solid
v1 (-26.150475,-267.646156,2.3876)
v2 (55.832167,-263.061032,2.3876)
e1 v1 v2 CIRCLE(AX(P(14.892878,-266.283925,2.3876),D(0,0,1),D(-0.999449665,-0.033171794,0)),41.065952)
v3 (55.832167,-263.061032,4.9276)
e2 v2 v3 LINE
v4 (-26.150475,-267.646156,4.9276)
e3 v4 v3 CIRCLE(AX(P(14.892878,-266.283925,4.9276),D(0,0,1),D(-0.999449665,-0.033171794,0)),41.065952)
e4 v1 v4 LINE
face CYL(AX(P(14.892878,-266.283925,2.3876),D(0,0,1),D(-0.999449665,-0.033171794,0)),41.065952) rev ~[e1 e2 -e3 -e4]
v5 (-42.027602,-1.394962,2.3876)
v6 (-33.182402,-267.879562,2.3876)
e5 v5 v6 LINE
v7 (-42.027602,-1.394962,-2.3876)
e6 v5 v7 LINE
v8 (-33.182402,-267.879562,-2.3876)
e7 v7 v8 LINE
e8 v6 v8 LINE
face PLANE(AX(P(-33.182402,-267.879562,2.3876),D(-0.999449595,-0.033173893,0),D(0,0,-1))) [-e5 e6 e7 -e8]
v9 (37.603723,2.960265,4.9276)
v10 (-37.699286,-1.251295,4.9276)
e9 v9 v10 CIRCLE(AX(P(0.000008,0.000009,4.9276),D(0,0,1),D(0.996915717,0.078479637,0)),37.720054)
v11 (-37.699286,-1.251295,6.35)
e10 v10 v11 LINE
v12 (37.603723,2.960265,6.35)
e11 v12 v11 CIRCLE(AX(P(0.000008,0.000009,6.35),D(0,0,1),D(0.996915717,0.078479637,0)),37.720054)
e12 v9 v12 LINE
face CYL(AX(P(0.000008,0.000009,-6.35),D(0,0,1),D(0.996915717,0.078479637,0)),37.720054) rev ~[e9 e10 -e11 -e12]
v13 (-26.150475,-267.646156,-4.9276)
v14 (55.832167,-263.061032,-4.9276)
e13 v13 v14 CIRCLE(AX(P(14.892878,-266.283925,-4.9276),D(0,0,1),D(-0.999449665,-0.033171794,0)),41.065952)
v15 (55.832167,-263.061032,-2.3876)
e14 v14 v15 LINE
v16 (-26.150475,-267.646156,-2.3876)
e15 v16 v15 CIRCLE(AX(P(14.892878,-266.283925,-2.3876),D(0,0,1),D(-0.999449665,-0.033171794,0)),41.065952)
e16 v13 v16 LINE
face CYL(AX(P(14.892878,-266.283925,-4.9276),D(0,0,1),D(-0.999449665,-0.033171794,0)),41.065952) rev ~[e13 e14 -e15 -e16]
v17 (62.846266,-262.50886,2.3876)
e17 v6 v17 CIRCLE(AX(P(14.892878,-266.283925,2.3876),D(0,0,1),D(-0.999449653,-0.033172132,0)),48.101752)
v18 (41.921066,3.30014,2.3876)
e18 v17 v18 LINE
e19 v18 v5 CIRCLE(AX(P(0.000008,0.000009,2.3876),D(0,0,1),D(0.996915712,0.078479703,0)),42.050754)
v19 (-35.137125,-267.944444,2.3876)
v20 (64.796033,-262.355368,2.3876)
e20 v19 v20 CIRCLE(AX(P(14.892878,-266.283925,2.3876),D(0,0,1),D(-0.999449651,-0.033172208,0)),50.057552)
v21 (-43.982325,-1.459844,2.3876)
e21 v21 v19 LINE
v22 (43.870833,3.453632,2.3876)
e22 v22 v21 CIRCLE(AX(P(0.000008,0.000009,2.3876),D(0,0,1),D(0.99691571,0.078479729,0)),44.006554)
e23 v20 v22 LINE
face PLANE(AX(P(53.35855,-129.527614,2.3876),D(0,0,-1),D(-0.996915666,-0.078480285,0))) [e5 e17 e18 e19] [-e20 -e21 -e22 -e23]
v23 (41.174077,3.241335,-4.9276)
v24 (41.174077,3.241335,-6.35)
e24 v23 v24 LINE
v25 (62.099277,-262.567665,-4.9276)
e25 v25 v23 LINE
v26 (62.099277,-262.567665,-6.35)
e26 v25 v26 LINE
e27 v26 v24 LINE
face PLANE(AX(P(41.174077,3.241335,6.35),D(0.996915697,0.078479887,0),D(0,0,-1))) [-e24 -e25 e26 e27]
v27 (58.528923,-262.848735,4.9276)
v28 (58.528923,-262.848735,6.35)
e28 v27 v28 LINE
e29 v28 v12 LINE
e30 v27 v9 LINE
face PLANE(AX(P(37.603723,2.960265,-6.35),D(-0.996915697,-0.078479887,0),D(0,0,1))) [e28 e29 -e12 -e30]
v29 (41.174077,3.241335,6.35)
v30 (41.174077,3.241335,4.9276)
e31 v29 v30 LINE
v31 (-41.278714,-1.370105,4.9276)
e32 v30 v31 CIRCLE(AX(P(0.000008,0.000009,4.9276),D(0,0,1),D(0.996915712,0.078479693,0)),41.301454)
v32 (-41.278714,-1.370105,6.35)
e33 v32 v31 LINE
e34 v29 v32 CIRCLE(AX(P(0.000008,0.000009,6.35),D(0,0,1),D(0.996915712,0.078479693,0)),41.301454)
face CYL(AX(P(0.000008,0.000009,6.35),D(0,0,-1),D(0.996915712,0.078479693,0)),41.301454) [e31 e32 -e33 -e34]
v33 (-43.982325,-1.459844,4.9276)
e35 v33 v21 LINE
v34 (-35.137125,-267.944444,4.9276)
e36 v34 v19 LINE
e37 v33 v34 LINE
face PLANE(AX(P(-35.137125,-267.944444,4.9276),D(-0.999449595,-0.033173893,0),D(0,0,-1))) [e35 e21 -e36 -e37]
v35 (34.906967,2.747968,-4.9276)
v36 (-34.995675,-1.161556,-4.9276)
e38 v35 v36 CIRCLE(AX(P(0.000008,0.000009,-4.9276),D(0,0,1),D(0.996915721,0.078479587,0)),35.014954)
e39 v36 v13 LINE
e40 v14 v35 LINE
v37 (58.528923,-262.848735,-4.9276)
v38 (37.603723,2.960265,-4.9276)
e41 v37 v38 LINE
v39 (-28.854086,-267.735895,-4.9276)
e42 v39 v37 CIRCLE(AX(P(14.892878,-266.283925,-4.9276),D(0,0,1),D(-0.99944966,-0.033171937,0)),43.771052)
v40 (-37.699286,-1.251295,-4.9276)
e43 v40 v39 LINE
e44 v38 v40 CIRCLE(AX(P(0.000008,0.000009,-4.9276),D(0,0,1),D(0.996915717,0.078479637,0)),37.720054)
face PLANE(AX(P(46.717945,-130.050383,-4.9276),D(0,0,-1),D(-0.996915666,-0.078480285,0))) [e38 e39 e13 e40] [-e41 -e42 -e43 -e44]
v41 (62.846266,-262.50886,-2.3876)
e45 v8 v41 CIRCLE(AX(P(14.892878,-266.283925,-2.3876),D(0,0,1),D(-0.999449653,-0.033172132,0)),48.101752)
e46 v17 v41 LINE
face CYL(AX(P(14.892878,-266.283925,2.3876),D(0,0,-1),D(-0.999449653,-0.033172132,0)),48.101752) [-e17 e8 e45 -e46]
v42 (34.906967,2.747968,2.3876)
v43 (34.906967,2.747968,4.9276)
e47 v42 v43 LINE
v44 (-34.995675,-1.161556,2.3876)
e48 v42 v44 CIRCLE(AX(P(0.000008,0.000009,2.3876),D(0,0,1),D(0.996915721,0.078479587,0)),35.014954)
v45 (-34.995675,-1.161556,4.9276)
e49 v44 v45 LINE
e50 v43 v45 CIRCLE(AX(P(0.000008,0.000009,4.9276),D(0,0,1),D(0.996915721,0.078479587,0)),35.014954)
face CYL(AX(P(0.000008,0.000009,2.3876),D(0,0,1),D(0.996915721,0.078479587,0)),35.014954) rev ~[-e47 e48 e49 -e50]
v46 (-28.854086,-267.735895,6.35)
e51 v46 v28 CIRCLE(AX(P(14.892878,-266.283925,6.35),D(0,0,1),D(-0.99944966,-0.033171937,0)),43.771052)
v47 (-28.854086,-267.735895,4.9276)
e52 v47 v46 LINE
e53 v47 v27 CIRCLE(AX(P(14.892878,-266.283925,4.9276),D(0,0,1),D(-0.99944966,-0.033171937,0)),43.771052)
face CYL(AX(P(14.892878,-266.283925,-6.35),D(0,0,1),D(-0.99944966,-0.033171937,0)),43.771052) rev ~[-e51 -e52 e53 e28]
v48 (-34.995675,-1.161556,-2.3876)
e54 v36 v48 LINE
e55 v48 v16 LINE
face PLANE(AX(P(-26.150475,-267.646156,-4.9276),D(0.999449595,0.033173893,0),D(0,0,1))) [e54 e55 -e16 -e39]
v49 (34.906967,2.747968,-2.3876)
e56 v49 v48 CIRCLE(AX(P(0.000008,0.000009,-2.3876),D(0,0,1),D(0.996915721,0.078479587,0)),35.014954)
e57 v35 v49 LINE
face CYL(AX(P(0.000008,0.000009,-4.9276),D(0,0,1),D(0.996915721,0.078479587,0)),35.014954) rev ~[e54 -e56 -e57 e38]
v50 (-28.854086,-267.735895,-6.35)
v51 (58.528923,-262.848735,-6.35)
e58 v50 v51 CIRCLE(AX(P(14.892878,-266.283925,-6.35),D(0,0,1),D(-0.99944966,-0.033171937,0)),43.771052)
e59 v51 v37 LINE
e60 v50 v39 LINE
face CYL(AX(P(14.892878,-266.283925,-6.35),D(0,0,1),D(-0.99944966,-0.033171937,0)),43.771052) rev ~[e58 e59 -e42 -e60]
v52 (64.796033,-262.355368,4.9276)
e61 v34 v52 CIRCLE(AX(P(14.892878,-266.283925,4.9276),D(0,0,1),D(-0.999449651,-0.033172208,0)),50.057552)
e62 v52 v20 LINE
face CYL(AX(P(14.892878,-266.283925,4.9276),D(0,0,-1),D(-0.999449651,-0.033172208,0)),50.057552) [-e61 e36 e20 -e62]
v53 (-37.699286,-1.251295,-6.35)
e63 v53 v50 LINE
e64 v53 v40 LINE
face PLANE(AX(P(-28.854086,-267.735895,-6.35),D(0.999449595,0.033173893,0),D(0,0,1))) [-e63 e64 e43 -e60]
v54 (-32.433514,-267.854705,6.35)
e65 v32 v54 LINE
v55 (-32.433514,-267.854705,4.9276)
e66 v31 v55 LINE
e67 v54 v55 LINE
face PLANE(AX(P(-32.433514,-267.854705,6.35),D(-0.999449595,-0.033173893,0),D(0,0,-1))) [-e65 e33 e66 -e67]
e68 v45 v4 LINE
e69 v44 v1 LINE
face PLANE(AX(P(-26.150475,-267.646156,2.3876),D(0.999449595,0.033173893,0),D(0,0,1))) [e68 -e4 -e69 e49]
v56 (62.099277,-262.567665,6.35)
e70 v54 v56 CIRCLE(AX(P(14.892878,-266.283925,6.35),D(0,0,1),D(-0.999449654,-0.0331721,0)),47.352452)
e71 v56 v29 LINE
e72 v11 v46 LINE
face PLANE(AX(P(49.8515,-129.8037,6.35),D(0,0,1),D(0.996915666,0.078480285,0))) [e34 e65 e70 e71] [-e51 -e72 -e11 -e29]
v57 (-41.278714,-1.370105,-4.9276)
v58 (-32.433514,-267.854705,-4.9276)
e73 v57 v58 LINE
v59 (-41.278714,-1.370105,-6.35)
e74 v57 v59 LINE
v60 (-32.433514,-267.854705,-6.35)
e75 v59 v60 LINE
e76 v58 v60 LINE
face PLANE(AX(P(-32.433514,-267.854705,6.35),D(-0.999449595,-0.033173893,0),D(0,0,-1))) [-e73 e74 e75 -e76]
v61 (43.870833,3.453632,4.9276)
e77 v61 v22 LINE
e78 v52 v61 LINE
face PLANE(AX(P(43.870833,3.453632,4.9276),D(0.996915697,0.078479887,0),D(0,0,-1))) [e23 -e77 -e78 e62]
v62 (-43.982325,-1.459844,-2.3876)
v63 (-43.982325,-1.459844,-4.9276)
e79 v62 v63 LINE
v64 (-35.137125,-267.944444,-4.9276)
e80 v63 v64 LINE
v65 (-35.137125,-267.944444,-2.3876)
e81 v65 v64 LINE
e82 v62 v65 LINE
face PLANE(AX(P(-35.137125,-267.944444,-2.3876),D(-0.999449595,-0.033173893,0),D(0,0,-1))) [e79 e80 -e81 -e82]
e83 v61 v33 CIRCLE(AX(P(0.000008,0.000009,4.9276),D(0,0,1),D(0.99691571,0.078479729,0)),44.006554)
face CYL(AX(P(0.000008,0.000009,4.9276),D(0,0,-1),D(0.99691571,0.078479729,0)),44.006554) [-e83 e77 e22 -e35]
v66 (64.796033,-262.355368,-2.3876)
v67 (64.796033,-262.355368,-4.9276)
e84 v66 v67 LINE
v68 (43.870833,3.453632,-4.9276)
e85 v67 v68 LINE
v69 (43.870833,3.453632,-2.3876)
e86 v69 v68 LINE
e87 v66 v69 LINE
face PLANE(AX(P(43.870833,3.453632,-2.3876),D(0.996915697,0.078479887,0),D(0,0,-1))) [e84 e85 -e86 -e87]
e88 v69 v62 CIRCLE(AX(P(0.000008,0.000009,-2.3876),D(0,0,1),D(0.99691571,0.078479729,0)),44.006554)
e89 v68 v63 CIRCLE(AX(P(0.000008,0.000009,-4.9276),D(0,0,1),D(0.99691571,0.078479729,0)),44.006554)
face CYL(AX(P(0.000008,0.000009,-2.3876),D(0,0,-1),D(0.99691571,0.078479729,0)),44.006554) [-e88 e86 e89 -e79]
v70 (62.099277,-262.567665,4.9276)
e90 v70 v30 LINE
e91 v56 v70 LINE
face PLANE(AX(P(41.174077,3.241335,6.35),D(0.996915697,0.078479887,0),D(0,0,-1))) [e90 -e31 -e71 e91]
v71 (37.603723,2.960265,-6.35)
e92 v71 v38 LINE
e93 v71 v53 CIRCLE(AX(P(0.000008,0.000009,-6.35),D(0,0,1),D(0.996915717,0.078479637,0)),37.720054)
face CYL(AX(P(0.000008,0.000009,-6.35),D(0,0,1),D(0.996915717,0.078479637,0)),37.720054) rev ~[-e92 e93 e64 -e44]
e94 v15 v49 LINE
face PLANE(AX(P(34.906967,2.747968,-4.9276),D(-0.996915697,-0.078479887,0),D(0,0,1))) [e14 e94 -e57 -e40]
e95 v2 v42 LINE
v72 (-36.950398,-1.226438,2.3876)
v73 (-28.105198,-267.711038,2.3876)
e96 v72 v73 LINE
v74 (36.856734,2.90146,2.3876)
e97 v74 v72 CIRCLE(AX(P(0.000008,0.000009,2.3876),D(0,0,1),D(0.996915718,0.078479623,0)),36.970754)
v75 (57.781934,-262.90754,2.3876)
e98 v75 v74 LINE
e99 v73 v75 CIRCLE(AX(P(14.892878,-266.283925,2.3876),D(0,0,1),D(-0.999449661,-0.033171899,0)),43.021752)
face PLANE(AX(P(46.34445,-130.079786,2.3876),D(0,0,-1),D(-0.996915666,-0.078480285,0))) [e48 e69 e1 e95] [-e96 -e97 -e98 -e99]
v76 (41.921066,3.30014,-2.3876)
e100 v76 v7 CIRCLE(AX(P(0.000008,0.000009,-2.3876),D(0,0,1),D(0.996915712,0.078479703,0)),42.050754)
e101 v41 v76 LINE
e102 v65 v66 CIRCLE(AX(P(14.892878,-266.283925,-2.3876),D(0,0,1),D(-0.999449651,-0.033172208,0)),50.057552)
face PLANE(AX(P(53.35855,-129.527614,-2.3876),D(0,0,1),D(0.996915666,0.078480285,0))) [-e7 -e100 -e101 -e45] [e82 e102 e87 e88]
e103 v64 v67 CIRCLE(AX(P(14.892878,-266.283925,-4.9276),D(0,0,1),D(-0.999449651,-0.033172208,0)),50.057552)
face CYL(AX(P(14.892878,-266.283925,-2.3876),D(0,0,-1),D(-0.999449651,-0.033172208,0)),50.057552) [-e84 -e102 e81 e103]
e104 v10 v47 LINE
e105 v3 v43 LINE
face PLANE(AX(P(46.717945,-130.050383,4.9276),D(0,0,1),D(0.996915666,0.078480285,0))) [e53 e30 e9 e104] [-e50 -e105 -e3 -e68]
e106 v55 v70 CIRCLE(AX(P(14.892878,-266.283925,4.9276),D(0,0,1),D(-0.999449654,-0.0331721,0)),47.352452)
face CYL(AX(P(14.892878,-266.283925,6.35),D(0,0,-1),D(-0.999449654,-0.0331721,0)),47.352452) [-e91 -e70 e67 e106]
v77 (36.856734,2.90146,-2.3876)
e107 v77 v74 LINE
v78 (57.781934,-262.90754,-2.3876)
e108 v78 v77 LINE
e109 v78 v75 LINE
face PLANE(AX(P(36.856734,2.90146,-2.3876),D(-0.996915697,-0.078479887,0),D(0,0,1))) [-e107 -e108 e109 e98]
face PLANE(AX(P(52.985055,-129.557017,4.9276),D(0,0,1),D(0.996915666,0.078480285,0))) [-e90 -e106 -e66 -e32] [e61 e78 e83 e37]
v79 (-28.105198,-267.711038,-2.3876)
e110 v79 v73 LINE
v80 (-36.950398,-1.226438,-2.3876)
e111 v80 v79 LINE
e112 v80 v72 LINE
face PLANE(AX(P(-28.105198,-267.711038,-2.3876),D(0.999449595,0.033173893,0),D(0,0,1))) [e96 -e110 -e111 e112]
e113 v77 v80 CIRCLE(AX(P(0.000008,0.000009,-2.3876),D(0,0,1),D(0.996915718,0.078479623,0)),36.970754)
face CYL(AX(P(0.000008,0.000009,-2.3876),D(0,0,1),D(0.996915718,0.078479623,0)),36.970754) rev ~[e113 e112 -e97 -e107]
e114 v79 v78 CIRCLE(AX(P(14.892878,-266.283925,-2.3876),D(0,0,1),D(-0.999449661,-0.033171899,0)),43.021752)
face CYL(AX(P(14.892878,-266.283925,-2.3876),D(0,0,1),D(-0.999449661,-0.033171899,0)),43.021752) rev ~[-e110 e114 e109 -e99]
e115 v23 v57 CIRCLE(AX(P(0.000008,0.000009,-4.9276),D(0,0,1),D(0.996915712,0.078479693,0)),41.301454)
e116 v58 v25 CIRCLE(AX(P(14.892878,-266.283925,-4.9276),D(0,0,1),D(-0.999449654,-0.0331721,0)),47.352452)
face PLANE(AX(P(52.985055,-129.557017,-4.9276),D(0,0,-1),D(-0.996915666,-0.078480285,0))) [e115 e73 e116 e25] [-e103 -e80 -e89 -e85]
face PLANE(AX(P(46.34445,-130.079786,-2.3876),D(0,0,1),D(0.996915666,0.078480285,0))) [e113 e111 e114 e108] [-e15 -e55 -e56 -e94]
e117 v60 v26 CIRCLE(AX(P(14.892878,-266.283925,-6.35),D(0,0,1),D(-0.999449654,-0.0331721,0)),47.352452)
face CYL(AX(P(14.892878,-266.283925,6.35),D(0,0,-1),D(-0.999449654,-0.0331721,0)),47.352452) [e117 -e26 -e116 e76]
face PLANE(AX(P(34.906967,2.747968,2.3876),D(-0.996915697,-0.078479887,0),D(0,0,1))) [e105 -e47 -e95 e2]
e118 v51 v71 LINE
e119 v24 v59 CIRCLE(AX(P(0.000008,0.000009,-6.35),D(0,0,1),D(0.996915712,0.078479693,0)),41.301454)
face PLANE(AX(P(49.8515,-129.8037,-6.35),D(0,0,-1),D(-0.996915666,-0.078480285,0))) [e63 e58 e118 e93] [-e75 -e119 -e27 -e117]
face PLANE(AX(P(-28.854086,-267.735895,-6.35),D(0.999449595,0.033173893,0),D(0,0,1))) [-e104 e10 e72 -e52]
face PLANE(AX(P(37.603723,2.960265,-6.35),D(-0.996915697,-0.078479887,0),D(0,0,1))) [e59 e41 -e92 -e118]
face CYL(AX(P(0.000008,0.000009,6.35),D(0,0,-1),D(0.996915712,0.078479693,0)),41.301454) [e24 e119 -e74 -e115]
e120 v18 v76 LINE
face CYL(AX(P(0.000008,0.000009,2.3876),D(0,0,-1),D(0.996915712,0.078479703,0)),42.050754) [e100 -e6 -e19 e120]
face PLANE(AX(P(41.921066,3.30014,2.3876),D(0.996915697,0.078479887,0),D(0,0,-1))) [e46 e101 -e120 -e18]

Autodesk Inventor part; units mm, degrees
ref_plane "Work Plane2" through (0, 0, 0) normal (-1, 0, 0) x (0, 0, 1)
ref_plane "Work Plane3" through (14.8929, -266.2839, 0) normal (0.0955418, 0.9954254, 0) x (0, 0, 1)
sketch "Path" plane through (0, 0, 0) normal (0, 0, 1) x (1, 0, 0)
  arc A0 (39.3889, 3.1008) -> (-39.489, -1.3107) centre (0, 0) ccw
  arc A1 (-30.6438, -267.7953) -> (60.3141, -262.7082) centre (14.8929, -266.2839) ccw
  line L0 (-30.6438, -267.7953) -> (-39.489, -1.3107)
  line L1 (39.3889, 3.1008) -> (60.3141, -262.7082)
  dimension "d31" = 8.9916
ref_plane "Section Plane" through (-39.489, -1.3107, 0) normal (0.0331741, -0.9994496, 0) x (0, 0, 1)
sketch "Section Sketch" plane through (-39.489, -1.3107, 0) normal (0.0331741, -0.9994496, 0) x (0, 0, 1)
  line L0 (-6.35, -1.7907) -> (6.35, -1.7907)
  line L1 (6.35, -1.7907) -> (6.35, 1.7907)
  line L2 (6.35, 1.7907) -> (-6.35, 1.7907)
  line L3 (-6.35, 1.7907) -> (-6.35, -1.7907)
  line L4 (-2.3876, -2.54) -> (2.3876, -2.54)
  line L5 (2.3876, -2.54) -> (2.3876, 2.54)
  line L6 (2.3876, 2.54) -> (-2.3876, 2.54)
  line L7 (-2.3876, 2.54) -> (-2.3876, -2.54)
  line L8 (-2.3876, 0) -> (2.3876, 0) construction
  line L9 (-4.9276, -4.4958) -> (-2.3876, -4.4958)
  line L10 (-2.3876, -4.4958) -> (-2.3876, 4.4958)
  line L11 (-2.3876, 4.4958) -> (-4.9276, 4.4958)
  line L12 (-4.9276, 4.4958) -> (-4.9276, -4.4958)
  line L13 (2.3876, -4.4958) -> (4.9276, -4.4958)
  line L14 (4.9276, -4.4958) -> (4.9276, 4.4958)
  line L15 (4.9276, 4.4958) -> (2.3876, 4.4958)
  line L16 (2.3876, 4.4958) -> (2.3876, -4.4958)
  line L17 (-6.35, 0) -> (6.35, 0) construction
  point P0 (0, 0)
  point P1 (0, 0)
  dimension "d21" = 3.5814
  dimension "d22" = 5.08
  dimension "d23" = 4.7752
  dimension "d24" = 2.54
  dimension "d31" = 8.9916
  dimension "d32" = 12.7
sweep "Solid" add profiles "Section Sketch" path "Path"
pattern_of_one "Strand Pattern"
equation "\"d21\" = da_d2"
equation "\"d22\" = da_d1"
equation "\"d23\" = da_b1"
equation "\"d24\" = da_t1 + da_t2"
equation "\"d30\" = da_pt"
equation "\"da_p\" = 9.525"
equation "\"da_b1\" = 4.7752"
equation "\"da_h2\" = 8.9916"
equation "\"da_h3\" = 7.7978"
equation "\"da_d1\" = 5.08"
equation "\"da_d2\" = 3.5814"
equation "\"da_pt\" = 10.1346"
equation "\"da_b\" = 12.7"
equation "\"da_t1\" = 1.27"
equation "\"da_t2\" = 1.27"
properties part number "Roller Chain"
